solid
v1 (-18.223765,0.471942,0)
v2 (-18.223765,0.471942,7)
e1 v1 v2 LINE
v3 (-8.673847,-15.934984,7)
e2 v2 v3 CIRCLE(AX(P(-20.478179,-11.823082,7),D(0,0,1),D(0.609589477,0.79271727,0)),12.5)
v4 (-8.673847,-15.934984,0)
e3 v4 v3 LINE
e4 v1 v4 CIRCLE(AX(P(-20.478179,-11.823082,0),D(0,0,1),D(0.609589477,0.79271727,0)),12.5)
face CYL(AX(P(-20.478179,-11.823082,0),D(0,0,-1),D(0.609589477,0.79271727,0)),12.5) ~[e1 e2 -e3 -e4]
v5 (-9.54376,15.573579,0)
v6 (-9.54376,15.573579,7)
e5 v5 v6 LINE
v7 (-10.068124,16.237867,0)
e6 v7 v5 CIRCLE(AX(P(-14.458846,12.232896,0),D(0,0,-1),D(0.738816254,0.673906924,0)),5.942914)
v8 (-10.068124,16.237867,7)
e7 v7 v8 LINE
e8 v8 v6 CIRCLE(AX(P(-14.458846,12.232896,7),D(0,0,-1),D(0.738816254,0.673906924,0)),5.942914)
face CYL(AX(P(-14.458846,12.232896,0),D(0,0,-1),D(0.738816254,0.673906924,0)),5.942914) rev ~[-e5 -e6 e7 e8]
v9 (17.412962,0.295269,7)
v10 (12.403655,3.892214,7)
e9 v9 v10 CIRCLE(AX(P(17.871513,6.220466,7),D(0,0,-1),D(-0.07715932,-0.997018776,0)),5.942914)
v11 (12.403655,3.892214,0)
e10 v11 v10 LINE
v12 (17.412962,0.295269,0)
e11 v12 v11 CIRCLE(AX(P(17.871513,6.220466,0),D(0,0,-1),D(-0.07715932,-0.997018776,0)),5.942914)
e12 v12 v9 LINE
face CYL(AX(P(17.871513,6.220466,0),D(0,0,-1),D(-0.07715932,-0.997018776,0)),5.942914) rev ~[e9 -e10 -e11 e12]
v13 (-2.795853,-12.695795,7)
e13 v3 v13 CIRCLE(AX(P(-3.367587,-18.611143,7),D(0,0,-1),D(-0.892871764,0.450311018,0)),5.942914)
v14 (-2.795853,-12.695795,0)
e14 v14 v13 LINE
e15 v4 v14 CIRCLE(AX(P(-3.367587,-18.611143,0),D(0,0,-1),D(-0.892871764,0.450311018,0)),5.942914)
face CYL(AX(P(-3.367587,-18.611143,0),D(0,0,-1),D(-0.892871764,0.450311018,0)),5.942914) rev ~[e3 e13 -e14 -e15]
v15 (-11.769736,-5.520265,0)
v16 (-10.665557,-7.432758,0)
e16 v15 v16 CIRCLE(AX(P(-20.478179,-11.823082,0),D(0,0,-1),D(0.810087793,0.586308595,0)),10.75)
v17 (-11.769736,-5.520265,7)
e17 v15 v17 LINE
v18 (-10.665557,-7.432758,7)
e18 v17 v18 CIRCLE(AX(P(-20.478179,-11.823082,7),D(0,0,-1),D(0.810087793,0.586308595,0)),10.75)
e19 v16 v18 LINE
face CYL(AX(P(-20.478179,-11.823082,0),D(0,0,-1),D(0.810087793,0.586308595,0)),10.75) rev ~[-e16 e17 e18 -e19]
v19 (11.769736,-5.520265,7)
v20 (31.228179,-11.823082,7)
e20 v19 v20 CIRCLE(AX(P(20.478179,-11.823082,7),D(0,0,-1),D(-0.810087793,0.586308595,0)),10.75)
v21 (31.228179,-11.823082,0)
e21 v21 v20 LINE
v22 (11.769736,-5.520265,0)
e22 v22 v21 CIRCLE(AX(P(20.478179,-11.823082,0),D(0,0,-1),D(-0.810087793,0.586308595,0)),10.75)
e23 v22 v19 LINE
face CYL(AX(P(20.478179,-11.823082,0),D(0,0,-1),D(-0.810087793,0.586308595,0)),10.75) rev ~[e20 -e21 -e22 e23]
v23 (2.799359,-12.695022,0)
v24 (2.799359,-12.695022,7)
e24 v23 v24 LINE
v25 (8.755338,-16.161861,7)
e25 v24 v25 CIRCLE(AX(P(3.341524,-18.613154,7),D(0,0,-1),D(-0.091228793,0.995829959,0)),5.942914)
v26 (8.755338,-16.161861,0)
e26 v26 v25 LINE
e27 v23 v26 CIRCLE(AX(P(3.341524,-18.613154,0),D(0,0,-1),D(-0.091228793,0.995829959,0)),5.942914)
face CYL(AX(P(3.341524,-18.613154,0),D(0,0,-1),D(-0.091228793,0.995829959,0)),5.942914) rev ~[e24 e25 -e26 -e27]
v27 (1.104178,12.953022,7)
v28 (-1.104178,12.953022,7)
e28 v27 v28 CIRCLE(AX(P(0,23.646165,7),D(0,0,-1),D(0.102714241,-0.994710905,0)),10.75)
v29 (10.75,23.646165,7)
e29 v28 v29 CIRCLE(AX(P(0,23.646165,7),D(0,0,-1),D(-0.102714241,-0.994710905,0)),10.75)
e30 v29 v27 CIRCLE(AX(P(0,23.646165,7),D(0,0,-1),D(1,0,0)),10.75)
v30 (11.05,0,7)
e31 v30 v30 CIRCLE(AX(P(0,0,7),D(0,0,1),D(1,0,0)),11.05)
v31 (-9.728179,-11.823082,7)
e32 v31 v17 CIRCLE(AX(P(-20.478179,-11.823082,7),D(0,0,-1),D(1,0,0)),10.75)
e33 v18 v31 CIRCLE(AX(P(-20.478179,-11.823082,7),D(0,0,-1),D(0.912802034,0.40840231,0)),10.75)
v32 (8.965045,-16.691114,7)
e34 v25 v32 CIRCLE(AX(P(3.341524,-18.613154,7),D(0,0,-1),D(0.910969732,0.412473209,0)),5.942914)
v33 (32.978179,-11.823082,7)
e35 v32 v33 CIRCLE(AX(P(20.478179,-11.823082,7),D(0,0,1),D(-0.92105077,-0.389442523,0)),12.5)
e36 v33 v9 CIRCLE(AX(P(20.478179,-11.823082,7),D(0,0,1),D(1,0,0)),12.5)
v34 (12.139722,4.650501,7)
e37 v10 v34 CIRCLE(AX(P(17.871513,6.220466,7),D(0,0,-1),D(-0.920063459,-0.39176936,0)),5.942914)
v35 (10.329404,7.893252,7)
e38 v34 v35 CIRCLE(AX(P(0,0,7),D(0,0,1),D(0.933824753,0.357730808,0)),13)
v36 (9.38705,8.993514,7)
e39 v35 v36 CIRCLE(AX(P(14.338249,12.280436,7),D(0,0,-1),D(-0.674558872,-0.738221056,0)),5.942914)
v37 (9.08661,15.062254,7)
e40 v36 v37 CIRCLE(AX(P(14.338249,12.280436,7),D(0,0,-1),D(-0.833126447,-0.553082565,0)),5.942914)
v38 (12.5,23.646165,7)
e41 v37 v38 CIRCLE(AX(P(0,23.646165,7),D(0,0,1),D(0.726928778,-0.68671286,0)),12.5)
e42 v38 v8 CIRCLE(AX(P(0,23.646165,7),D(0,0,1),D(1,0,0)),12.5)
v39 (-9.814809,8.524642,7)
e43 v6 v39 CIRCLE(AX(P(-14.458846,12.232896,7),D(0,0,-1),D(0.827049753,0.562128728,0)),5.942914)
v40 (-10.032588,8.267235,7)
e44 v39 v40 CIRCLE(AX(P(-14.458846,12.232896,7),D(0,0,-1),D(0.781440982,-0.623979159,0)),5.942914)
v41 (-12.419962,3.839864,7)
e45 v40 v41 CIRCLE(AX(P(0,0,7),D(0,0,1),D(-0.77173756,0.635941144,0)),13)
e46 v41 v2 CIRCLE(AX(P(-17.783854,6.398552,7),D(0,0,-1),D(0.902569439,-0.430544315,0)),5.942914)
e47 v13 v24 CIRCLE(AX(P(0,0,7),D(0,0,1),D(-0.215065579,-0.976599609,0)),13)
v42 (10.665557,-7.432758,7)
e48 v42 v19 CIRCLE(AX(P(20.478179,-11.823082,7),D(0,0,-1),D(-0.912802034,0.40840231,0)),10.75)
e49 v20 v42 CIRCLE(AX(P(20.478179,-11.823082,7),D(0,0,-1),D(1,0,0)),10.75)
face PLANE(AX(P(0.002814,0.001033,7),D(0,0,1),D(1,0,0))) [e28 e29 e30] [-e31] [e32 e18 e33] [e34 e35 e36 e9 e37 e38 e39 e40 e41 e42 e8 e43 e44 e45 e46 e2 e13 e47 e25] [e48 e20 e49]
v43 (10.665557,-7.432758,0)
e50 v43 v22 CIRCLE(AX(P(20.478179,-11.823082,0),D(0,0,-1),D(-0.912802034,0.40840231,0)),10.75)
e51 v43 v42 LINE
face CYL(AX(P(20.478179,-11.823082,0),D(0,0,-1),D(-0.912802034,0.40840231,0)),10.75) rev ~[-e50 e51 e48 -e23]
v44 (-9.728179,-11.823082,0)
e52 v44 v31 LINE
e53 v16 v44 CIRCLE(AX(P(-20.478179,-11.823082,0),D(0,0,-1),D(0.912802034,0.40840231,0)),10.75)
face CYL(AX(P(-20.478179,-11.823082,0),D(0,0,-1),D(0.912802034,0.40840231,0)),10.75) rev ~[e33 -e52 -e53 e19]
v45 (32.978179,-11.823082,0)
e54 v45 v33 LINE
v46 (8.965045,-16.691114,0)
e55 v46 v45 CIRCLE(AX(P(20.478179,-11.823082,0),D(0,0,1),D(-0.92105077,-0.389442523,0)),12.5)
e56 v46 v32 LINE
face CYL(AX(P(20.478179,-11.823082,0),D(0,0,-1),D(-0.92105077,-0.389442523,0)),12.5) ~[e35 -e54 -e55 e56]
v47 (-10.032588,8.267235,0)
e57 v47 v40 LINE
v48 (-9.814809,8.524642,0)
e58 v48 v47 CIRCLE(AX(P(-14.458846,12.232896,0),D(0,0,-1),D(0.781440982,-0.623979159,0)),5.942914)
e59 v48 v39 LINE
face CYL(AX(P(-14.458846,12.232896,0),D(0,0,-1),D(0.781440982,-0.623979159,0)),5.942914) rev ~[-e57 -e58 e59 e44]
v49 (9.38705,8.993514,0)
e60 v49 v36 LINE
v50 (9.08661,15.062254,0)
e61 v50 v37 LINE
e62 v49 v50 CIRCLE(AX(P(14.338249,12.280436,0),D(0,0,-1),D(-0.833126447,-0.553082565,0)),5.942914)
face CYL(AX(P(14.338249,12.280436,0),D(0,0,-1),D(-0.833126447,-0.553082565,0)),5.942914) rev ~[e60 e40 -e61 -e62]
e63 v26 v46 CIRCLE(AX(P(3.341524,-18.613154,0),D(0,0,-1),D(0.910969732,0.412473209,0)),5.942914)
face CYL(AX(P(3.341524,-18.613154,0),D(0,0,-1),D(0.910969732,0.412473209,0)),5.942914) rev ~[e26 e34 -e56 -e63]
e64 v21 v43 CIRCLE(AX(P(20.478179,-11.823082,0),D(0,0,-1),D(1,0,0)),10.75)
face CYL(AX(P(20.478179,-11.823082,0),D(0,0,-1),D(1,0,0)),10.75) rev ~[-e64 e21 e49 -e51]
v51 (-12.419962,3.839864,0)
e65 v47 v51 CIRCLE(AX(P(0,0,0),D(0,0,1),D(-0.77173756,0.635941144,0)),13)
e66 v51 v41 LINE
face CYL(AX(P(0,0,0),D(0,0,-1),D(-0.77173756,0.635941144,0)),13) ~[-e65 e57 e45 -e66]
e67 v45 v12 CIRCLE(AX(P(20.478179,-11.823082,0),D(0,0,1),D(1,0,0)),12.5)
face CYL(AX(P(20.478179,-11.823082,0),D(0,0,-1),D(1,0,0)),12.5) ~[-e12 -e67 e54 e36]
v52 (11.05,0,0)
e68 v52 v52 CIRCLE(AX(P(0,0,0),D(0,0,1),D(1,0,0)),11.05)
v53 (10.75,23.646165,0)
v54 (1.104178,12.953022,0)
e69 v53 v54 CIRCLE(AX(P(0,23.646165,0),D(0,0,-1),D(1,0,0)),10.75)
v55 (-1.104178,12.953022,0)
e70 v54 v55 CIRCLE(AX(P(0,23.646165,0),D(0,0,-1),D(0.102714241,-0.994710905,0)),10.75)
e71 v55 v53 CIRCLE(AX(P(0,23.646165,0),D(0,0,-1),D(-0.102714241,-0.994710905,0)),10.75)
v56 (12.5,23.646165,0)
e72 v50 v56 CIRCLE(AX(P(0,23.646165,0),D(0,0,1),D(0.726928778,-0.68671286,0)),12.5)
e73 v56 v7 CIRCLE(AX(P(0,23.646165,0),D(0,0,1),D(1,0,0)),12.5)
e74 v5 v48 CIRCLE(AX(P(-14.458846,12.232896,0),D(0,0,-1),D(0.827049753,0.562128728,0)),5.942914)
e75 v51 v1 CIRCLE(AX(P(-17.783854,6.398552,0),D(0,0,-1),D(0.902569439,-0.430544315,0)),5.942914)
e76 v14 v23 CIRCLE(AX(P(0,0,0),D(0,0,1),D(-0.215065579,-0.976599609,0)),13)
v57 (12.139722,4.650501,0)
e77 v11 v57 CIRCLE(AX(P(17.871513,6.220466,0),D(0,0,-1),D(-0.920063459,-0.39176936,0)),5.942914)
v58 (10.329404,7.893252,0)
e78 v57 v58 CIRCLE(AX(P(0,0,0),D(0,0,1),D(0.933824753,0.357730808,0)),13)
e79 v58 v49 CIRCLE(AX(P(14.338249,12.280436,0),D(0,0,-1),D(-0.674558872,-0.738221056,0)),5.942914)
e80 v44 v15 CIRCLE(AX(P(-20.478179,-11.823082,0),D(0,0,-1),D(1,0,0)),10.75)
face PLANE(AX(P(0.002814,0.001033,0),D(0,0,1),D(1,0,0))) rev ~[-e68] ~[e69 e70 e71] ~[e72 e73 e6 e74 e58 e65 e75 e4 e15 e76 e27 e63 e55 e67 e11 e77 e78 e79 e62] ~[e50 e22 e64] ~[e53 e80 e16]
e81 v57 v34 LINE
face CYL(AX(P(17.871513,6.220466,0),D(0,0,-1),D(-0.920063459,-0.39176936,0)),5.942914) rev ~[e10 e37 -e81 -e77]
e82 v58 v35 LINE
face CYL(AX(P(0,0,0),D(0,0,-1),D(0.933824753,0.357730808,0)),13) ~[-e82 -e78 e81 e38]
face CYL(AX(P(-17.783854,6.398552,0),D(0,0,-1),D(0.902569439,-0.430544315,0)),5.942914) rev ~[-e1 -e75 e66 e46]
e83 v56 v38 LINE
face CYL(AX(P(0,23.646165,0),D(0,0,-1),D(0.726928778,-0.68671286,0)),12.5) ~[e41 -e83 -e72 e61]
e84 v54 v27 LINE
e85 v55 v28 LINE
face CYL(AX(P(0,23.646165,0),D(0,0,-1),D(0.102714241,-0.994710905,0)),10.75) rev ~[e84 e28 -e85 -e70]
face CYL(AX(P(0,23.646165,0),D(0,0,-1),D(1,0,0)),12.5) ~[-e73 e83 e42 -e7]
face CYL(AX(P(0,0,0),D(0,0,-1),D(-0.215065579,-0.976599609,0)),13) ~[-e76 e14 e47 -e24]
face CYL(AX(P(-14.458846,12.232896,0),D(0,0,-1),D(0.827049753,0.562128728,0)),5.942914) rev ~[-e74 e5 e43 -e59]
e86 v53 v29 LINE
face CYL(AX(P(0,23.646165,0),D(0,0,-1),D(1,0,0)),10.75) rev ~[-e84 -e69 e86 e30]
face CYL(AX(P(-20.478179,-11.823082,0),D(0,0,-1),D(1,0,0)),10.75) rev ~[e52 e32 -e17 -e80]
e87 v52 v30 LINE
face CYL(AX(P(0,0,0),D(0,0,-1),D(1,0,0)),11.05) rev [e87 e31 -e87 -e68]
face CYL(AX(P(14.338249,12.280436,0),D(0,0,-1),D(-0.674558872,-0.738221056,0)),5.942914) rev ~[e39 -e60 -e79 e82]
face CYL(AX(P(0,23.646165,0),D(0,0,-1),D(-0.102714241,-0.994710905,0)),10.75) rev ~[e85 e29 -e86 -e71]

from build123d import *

# Parameters (mm, degrees)
F0_R     = 11.05
F1_DEPTH = 7


with BuildPart() as f1:
    # F0 (on Top) → F1 (new body)
    with BuildSketch(Plane.XY):
        with BuildLine():
            ThreePointArc((12.4036553845, 3.8922144215), (12.2588680886, 4.2668950825), (12.1397217876, 4.650500502))
            ThreePointArc((12.1397217876, 4.650500502), (11.3509584551, 6.3368558568), (10.3294036233, 7.8932515979))
            ThreePointArc((10.3294036233, 7.8932515979), (9.8245761866, 8.414561478), (9.3870501636, 8.9935137308))
            ThreePointArc((9.3870501636, 8.9935137308), (7.2468764963, 10.7927188904), (4.7714819389, 12.092682089))
            ThreePointArc((4.7714819389, 12.092682089), (0, 11.1461646855), (-4.7714819389, 12.092682089))
            ThreePointArc((-4.7714819389, 12.092682089), (-7.5081755961, 10.6126009639), (-9.8148092936, 8.5246418417))
            ThreePointArc((-9.8148092936, 8.5246418417), (-9.9218729104, 8.3943935706), (-10.0325882839, 8.2672348658))
            ThreePointArc((-10.0325882839, 8.2672348658), (-11.4424495934, 6.1701172844), (-12.419961597, 3.8398637906))
            ThreePointArc((-12.419961597, 3.8398637906), (-12.9624394617, 0.9875035204), (-12.8583108585, -1.9141164717))
            ThreePointArc((-12.8583108585, -1.9141164717), (-9.6528617724, -5.5730823427), (-8.0868289195, -10.1785656173))
            ThreePointArc((-8.0868289195, -10.1785656173), (-5.5850066858, -11.7391524532), (-2.7958525219, -12.695794921))
            ThreePointArc((-2.7958525219, -12.695794921), (0.0017952144, -12.999999876), (2.7993588265, -12.6950222592))
            ThreePointArc((2.7993588265, -12.6950222592), (5.5866277322, -11.7383810886), (8.0868289195, -10.1785656173))
            ThreePointArc((8.0868289195, -10.1785656173), (9.6528617724, -5.5730823427), (12.8583108585, -1.9141164717))
            ThreePointArc((12.8583108585, -1.9141164717), (12.9645293235, -0.9596767268), (13, 0))
            ThreePointArc((13, 0), (12.8500490271, 1.9688169038), (12.4036553845, 3.8922144215))
        make_face()
        Circle(F0_R, mode=Mode.SUBTRACT)
        with BuildLine():
            ThreePointArc((17.4129621968, 0.2952691949), (14.4052350934, 1.3931332806), (12.4036553845, 3.8922144215))
            ThreePointArc((12.4036553845, 3.8922144215), (12.8500490271, 1.9688169038), (13, 0))
            ThreePointArc((13, 0), (12.9645293235, -0.9596767268), (12.8583108585, -1.9141164717))
            ThreePointArc((12.8583108585, -1.9141164717), (15.0226216268, -0.5764432777), (17.4129621968, 0.2952691949))
        make_face()
        with BuildLine():
            ThreePointArc((4.7714819389, 12.092682089), (7.2468764963, 10.7927188904), (9.3870501636, 8.9935137308))
            ThreePointArc((9.3870501636, 8.9935137308), (8.402604273, 11.9865844679), (9.0866097244, 15.0622539383))
            ThreePointArc((9.0866097244, 15.0622539383), (7.0863435832, 13.3488963768), (4.7714819389, 12.092682089))
        make_face()
        with BuildLine():
            ThreePointArc((32.9781793197, -11.8230823427), (28.1572022381, -1.9598877782), (17.4129621968, 0.2952691949))
            ThreePointArc((17.4129621968, 0.2952691949), (15.0226216268, -0.5764432777), (12.8583108585, -1.9141164717))
            ThreePointArc((12.8583108585, -1.9141164717), (12.4453302152, -3.7568278952), (11.7697355483, -5.5202649505))
            ThreePointArc((11.7697355483, -5.5202649505), (23.7907862581, -1.5961993733), (31.2281793197, -11.8230823427))
            ThreePointArc((31.2281793197, -11.8230823427), (18.2335395964, -22.3361262651), (10.6655574569, -7.4327575054))
            ThreePointArc((10.6655574569, -7.4327575054), (9.4761735025, -8.8995581772), (8.0868289195, -10.1785656173))
            ThreePointArc((8.0868289195, -10.1785656173), (8.05547786, -13.2110623297), (8.7553384731, -16.161861259))
            ThreePointArc((8.7553384731, -16.161861259), (8.8665325035, -16.4239751001), (8.9650446915, -16.6911138785))
            ThreePointArc((8.9650446915, -16.6911138785), (22.9617067654, -24.0738819667), (32.9781793197, -11.8230823427))
        make_face()
        with BuildLine():
            ThreePointArc((-4.7714819389, 12.092682089), (0, 11.1461646855), (4.7714819389, 12.092682089))
            ThreePointArc((4.7714819389, 12.092682089), (2.9691567127, 12.6563860725), (1.1041780914, 12.9530224559))
            ThreePointArc((1.1041780914, 12.9530224559), (0, 12.8961646855), (-1.1041780914, 12.9530224559))
            ThreePointArc((-1.1041780914, 12.9530224559), (-2.9691567127, 12.6563860725), (-4.7714819389, 12.092682089))
        make_face()
        with BuildLine():
            ThreePointArc((1.1041780914, 12.9530224559), (2.9691567127, 12.6563860725), (4.7714819389, 12.092682089))
            ThreePointArc((4.7714819389, 12.092682089), (7.0863435832, 13.3488963768), (9.0866097244, 15.0622539383))
            ThreePointArc((9.0866097244, 15.0622539383), (11.6153480696, 19.027324006), (12.5, 23.6461646855))
            ThreePointArc((12.5, 23.6461646855), (-3.8986180344, 35.5226446952), (-10.0681243875, 16.2378672213))
            ThreePointArc((-10.0681243875, 16.2378672213), (-9.794102473, 15.9150690623), (-9.5437602938, 15.5735790121))
            ThreePointArc((-9.5437602938, 15.5735790121), (-7.3661863194, 13.5471895341), (-4.7714819389, 12.092682089))
            ThreePointArc((-4.7714819389, 12.092682089), (-2.9691567127, 12.6563860725), (-1.1041780914, 12.9530224559))
            ThreePointArc((-1.1041780914, 12.9530224559), (-7.2004369839, 31.6284079317), (10.75, 23.6461646855))
            ThreePointArc((10.75, 23.6461646855), (7.9822432462, 16.4457277016), (1.1041780914, 12.9530224559))
        make_face()
        with BuildLine():
            ThreePointArc((11.7697355483, -5.5202649505), (12.4453302152, -3.7568278952), (12.8583108585, -1.9141164717))
            ThreePointArc((12.8583108585, -1.9141164717), (9.6528617724, -5.5730823427), (8.0868289195, -10.1785656173))
            ThreePointArc((8.0868289195, -10.1785656173), (9.4761735025, -8.8995581772), (10.6655574569, -7.4327575054))
            ThreePointArc((10.6655574569, -7.4327575054), (11.168406229, -6.4480823427), (11.7697355483, -5.5202649505))
        make_face()
        with BuildLine():
            ThreePointArc((-9.8148092936, 8.5246418417), (-7.5081755961, 10.6126009639), (-4.7714819389, 12.092682089))
            ThreePointArc((-4.7714819389, 12.092682089), (-7.3661863194, 13.5471895341), (-9.5437602938, 15.5735790121))
            ThreePointArc((-9.5437602938, 15.5735790121), (-8.5203205537, 12.0045453967), (-9.8148092936, 8.5246418417))
        make_face()
        with BuildLine():
            ThreePointArc((8.7553384731, -16.161861259), (8.05547786, -13.2110623297), (8.0868289195, -10.1785656173))
            ThreePointArc((8.0868289195, -10.1785656173), (5.5866277322, -11.7383810886), (2.7993588265, -12.6950222592))
            ThreePointArc((2.7993588265, -12.6950222592), (6.3311702253, -13.4769842407), (8.7553384731, -16.161861259))
        make_face()
        with BuildLine():
            ThreePointArc((-8.6738467532, -15.9349836863), (-6.2358648809, -13.4062219399), (-2.7958525219, -12.695794921))
            ThreePointArc((-2.7958525219, -12.695794921), (-5.5850066858, -11.7391524532), (-8.0868289195, -10.1785656173))
            ThreePointArc((-8.0868289195, -10.1785656173), (-8.0053712958, -10.9990313741), (-7.9781793197, -11.8230823427))
            ThreePointArc((-7.9781793197, -11.8230823427), (-8.1533231931, -13.9082493527), (-8.6738467532, -15.9349836863))
        make_face()
        with BuildLine():
            ThreePointArc((-12.8583108585, -1.9141164717), (-12.9624394617, 0.9875035204), (-12.419961597, 3.8398637906))
            ThreePointArc((-12.419961597, 3.8398637906), (-14.8010494837, 1.2584054136), (-18.2237650289, 0.4719416997))
            ThreePointArc((-18.2237650289, 0.4719416997), (-15.3989388877, -0.4015536958), (-12.8583108585, -1.9141164717))
        make_face()
        with BuildLine():
            ThreePointArc((-7.9781793197, -11.8230823427), (-8.0053712958, -10.9990313741), (-8.0868289195, -10.1785656173))
            ThreePointArc((-8.0868289195, -10.1785656173), (-9.4761735025, -8.8995581772), (-10.6655574569, -7.4327575054))
            ThreePointArc((-10.6655574569, -7.4327575054), (-9.9651353974, -9.5784426194), (-9.7281793197, -11.8230823427))
            ThreePointArc((-9.7281793197, -11.8230823427), (-30.7050622892, -15.1356892812), (-11.7697355483, -5.5202649505))
            ThreePointArc((-11.7697355483, -5.5202649505), (-12.4453302152, -3.7568278952), (-12.8583108585, -1.9141164717))
            ThreePointArc((-12.8583108585, -1.9141164717), (-15.3989388877, -0.4015536958), (-18.2237650289, 0.4719416997))
            ThreePointArc((-18.2237650289, 0.4719416997), (-31.281368245, -18.1112544972), (-8.6738467532, -15.9349836863))
            ThreePointArc((-8.6738467532, -15.9349836863), (-8.1533231931, -13.9082493527), (-7.9781793197, -11.8230823427))
        make_face()
        with BuildLine():
            ThreePointArc((-10.6655574569, -7.4327575054), (-9.4761735025, -8.8995581772), (-8.0868289195, -10.1785656173))
            ThreePointArc((-8.0868289195, -10.1785656173), (-9.6528617724, -5.5730823427), (-12.8583108585, -1.9141164717))
            ThreePointArc((-12.8583108585, -1.9141164717), (-12.4453302152, -3.7568278952), (-11.7697355483, -5.5202649505))
            ThreePointArc((-11.7697355483, -5.5202649505), (-11.168406229, -6.4480823427), (-10.6655574569, -7.4327575054))
        make_face()
    extrude(amount=F1_DEPTH)


solid = f1.part
